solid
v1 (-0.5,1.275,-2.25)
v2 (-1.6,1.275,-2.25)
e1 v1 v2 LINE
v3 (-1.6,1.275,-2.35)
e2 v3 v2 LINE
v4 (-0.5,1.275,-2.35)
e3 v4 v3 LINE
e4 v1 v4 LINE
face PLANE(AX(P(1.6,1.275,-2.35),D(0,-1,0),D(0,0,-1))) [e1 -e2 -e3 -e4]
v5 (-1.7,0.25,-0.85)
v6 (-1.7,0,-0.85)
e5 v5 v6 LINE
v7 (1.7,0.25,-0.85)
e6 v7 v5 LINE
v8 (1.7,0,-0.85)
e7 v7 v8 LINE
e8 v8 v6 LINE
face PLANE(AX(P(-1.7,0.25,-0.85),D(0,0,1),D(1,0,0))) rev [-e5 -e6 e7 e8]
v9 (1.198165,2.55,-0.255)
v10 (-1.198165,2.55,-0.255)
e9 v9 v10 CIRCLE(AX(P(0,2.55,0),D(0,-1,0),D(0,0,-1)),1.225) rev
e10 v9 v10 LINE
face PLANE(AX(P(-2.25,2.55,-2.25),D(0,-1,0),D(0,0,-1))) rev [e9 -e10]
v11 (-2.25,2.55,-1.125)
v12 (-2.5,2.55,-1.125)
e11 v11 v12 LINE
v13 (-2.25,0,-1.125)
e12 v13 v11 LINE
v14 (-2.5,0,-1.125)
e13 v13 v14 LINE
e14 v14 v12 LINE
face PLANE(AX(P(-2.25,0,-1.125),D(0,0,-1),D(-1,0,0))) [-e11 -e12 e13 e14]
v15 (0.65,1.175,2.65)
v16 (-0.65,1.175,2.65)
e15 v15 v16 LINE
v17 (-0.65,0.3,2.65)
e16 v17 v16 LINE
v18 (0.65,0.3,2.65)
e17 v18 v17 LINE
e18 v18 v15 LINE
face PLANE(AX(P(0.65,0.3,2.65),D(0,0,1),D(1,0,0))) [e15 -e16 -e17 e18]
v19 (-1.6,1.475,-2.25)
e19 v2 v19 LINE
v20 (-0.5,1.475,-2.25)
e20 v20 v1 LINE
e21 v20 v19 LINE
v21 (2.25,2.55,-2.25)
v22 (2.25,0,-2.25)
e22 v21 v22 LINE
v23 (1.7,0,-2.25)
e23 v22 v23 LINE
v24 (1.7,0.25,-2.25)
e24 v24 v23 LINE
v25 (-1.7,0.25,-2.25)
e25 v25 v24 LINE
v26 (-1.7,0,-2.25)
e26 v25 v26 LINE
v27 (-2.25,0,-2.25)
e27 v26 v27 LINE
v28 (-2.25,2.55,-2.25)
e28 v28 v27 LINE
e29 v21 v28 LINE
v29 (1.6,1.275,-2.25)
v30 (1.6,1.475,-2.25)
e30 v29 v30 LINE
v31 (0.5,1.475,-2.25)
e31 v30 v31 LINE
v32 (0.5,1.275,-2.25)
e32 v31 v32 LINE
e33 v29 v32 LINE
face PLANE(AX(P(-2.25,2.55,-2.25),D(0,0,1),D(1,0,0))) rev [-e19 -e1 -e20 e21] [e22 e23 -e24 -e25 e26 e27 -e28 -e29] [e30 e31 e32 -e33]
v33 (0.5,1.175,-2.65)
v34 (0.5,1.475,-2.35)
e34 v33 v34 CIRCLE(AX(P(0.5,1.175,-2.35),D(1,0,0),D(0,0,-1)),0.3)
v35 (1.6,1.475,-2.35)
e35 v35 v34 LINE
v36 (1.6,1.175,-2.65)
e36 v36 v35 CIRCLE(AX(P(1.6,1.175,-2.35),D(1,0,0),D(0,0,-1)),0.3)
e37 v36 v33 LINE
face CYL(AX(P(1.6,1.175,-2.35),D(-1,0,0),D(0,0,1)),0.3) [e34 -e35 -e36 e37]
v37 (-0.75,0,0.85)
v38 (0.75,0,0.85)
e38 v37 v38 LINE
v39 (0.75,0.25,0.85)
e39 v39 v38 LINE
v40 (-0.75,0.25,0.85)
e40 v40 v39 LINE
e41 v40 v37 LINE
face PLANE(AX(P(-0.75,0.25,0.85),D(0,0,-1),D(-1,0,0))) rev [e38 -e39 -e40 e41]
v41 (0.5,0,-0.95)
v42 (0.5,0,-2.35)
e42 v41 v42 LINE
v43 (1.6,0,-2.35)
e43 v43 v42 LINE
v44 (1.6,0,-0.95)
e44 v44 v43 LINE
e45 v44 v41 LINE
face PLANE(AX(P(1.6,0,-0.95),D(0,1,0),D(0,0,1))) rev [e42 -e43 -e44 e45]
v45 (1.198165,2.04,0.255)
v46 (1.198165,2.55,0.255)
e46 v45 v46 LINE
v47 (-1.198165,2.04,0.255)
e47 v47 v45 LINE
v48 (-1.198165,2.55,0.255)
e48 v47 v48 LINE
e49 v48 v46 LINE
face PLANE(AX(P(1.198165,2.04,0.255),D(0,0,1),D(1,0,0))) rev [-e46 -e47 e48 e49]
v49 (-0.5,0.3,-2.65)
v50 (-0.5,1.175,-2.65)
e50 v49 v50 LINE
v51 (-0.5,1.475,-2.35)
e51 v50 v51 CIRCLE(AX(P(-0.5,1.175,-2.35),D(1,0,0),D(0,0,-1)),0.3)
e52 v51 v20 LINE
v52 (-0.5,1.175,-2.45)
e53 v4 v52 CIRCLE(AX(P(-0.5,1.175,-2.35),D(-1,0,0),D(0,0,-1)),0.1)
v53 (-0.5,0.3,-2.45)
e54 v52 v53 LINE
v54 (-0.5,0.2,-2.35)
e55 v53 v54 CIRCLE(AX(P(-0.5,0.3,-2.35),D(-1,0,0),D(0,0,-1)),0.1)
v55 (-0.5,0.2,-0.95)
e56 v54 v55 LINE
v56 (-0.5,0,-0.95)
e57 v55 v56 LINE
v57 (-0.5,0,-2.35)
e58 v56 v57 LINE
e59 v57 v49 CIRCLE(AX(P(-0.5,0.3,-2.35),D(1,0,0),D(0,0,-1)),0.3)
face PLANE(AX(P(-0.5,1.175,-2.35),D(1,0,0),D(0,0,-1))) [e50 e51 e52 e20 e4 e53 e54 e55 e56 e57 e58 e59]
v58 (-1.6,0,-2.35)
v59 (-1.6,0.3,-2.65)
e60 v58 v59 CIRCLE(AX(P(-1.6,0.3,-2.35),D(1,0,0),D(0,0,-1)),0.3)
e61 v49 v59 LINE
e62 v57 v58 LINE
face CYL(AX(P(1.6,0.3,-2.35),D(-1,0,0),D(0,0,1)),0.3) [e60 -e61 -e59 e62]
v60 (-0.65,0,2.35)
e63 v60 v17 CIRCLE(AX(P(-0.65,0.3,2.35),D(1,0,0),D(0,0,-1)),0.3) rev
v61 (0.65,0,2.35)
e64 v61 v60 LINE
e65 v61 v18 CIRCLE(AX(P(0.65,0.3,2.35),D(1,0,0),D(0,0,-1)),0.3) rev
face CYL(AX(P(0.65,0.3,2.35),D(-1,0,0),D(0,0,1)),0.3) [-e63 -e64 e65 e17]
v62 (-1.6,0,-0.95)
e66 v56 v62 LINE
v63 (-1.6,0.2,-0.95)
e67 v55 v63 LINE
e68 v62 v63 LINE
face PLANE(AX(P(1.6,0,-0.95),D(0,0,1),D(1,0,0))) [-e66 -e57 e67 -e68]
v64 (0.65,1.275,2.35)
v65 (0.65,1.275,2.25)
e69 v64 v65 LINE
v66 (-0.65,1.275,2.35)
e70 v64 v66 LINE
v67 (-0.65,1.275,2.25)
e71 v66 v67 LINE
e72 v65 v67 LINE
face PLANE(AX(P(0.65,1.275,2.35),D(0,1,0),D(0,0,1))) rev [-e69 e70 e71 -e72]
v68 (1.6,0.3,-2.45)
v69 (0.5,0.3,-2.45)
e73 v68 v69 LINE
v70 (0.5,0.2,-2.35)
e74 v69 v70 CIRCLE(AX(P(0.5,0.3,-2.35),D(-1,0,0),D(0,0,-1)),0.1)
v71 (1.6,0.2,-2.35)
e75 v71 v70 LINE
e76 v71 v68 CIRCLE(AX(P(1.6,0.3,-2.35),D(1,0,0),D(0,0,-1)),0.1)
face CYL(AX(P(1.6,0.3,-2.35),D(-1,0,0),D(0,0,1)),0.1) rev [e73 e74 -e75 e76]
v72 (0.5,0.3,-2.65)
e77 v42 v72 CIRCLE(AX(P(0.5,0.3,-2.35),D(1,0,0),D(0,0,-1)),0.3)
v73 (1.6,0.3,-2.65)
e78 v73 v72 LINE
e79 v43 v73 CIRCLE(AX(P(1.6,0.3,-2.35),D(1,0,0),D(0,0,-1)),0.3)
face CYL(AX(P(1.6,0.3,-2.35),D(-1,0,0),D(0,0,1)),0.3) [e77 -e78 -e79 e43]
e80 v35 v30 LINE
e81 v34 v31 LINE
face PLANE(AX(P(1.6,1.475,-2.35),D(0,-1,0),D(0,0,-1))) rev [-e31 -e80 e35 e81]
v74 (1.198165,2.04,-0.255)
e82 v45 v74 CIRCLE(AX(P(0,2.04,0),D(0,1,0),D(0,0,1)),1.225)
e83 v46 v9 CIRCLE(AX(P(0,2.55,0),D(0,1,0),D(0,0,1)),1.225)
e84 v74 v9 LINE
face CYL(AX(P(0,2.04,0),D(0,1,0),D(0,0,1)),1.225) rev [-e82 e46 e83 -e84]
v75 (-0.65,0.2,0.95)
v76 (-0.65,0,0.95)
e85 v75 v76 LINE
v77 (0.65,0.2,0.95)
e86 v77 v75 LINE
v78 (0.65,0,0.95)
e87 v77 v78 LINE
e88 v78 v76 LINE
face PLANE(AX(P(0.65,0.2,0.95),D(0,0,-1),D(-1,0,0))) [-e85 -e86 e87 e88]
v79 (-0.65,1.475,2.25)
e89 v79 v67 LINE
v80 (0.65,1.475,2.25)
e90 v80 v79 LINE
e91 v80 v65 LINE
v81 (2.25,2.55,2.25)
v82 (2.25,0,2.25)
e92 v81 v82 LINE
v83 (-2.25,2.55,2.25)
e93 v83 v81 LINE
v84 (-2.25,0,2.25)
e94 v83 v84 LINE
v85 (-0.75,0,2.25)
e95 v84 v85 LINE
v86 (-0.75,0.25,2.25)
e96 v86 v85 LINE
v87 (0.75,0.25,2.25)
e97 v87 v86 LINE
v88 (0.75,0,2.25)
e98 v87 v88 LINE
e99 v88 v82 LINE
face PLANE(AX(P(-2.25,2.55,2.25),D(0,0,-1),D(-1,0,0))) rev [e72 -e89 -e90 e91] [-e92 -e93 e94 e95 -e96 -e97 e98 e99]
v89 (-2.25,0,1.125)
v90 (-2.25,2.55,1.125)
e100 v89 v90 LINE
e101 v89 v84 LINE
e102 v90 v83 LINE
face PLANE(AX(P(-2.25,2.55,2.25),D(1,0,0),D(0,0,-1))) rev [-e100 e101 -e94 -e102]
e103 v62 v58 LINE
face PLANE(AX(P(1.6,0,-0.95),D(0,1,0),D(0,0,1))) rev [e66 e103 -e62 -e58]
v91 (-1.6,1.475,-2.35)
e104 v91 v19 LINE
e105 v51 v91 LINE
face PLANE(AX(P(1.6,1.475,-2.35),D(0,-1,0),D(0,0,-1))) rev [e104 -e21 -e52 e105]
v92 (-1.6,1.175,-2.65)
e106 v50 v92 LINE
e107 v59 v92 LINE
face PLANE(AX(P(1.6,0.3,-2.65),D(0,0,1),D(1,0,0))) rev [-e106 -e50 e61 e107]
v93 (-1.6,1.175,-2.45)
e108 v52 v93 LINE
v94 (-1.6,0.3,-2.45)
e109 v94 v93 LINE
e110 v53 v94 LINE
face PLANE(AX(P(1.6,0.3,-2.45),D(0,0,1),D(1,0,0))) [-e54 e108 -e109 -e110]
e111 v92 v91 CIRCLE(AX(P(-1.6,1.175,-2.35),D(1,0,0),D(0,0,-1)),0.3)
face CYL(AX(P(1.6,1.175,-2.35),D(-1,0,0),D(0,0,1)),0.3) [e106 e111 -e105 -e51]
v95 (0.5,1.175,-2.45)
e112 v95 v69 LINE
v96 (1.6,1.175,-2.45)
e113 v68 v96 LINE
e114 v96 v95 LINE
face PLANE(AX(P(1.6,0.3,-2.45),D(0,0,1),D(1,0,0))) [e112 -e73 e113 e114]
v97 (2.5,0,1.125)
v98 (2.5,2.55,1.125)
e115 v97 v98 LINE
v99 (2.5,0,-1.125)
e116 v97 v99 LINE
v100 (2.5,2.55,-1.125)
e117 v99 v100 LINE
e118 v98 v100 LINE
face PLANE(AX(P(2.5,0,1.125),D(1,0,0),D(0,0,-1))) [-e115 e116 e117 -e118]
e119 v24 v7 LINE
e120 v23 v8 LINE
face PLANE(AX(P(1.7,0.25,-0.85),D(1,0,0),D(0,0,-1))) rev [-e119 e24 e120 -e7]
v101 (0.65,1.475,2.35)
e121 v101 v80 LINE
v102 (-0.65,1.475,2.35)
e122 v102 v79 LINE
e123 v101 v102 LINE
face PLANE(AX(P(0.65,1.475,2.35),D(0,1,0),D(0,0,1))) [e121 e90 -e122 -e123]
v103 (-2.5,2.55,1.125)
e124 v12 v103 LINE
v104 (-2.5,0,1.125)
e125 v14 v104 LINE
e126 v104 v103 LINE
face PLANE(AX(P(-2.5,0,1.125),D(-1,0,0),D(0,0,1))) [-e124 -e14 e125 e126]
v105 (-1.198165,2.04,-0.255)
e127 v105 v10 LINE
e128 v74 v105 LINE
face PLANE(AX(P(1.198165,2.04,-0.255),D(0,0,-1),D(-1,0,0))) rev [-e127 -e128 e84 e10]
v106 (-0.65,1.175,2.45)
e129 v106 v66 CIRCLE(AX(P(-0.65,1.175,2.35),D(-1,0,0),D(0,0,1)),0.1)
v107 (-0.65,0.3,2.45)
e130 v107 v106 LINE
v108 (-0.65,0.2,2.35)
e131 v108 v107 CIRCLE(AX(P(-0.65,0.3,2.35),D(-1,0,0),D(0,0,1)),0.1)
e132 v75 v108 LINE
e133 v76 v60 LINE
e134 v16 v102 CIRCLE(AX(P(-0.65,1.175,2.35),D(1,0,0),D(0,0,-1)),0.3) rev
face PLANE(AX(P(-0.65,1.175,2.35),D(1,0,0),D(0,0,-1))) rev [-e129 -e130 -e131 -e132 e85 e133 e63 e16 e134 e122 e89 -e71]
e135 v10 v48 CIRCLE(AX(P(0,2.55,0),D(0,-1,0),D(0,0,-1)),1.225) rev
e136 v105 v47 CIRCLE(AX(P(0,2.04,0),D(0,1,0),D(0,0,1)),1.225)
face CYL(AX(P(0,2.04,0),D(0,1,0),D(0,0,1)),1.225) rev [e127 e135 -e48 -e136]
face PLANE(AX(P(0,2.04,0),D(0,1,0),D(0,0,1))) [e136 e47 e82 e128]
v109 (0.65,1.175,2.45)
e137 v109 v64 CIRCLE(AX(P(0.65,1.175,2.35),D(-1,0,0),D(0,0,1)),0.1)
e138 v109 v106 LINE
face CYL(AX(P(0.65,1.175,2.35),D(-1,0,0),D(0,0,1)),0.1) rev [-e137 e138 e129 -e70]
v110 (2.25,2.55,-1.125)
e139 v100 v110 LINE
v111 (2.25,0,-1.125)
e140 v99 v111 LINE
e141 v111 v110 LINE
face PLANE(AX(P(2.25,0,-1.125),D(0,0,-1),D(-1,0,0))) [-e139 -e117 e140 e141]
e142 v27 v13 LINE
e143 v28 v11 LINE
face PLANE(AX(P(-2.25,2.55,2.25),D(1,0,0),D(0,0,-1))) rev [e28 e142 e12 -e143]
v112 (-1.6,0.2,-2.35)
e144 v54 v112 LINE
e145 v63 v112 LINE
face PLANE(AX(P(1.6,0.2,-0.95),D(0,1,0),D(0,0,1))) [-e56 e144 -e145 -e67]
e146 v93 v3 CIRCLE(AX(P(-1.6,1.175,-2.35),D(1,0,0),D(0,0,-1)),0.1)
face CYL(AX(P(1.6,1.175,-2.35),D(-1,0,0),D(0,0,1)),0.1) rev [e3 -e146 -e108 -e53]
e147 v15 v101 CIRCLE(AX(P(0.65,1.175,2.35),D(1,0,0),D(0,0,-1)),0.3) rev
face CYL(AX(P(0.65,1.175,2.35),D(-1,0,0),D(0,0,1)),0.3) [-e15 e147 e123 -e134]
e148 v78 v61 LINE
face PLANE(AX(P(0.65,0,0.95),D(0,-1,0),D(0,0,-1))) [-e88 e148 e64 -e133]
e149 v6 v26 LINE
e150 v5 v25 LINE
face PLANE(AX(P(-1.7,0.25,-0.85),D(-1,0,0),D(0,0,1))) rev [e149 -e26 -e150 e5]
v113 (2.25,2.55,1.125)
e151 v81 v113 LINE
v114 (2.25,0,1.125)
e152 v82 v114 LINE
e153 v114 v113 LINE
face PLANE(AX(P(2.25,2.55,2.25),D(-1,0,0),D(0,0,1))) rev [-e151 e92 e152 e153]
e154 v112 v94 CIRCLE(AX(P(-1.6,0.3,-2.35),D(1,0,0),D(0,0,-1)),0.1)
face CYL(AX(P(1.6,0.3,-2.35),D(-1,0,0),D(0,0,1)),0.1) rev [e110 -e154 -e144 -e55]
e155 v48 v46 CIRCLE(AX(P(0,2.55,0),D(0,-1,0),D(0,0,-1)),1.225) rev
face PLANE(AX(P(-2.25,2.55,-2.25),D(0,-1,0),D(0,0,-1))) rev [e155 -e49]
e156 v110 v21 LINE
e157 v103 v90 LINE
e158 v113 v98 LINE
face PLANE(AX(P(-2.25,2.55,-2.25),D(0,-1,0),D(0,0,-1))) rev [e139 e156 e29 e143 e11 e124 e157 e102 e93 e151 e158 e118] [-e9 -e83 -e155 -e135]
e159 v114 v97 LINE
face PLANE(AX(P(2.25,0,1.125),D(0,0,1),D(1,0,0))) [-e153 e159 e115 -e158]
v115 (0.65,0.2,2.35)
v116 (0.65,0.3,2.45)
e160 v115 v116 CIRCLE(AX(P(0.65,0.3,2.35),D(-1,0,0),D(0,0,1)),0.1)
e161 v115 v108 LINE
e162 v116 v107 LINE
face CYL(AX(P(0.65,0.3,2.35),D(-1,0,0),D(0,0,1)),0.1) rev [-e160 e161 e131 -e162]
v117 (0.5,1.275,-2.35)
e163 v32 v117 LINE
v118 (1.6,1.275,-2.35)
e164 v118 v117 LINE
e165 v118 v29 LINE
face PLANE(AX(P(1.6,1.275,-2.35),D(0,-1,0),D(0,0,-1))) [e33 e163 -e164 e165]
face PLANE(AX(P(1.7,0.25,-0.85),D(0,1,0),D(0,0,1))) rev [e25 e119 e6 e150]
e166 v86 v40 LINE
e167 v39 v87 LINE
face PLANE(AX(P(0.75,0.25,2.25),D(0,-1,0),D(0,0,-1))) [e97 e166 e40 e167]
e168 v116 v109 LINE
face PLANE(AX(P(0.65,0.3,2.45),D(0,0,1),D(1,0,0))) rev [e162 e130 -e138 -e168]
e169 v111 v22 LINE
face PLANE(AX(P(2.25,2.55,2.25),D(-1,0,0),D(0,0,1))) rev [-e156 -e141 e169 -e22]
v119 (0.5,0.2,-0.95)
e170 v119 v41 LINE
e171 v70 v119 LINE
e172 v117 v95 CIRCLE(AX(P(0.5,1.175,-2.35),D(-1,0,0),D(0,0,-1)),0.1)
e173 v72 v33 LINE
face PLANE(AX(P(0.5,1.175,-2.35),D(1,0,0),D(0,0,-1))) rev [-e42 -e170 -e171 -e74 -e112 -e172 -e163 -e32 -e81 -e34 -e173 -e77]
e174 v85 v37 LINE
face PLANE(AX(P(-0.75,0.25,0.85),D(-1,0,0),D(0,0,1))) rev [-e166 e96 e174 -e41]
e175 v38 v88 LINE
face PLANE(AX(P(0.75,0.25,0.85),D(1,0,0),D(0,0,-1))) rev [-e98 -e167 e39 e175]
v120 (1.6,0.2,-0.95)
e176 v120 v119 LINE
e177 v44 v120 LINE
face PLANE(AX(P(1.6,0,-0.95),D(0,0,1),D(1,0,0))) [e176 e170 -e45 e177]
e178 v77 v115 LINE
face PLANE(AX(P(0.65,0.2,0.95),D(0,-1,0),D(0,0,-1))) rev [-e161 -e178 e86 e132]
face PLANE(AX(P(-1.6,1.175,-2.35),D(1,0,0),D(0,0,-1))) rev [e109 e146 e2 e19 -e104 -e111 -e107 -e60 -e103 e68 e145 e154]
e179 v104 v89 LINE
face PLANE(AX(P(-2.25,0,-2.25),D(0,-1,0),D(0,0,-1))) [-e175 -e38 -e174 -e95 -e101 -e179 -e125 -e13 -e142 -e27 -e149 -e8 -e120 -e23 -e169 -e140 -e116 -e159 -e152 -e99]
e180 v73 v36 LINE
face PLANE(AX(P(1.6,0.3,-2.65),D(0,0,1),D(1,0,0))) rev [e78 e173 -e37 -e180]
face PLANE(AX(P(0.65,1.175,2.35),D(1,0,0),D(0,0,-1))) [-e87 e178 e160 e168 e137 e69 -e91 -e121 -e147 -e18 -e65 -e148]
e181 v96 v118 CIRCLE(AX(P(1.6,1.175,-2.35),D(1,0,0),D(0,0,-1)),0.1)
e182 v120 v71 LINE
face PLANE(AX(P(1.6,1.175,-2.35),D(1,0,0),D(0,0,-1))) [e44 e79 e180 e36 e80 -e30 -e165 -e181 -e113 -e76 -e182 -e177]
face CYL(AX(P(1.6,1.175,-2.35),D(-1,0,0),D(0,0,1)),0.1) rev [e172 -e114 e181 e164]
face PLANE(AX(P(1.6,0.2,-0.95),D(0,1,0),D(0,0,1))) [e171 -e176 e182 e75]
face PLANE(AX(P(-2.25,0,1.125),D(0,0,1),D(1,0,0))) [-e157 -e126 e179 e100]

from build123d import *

# Parameters (mm, degrees)
SKETCH1_W                        = 4.5
SKETCH1_H                        = 4.5
BASE_EXTRUDE_DEPTH               = 2.55
SKETCH2_W                        = 0.25
SKETCH2_H                        = 2.25
EARS_EXTRUDE1_DEPTH              = 2.55
SKETCH9_W                        = 3.4
SKETCH9_H                        = 1.4
SKETCH9_W_2                      = 1.5
RELIEF_CUT_BTM_DEPTH             = 0.25
DOUBLE_START                     = -1.6
DOUBLE_FEET_EXTRUDE_THIN1_DEPTH  = 3.2
SINGLE_START                     = -0.65
SINGLE_FOOT_EXTRUDE_THIN2_DEPTH  = 1.3
REMOVE_MIDDLE_OF_FEET_DEPTH      = 0.5
SCREW_DRIVER_SLOT_EXTRUDE2_DEPTH = 0.51


# Read off the part's stored shape, not the designer's step: double feet-Extrude-Thin1, single foot-Extrude-Thin2
with BuildPart() as part:
    # Sketch1 → Base-Extrude (new body)
    with BuildSketch(Plane(origin=(0, 0, 0), x_dir=(1, 0, 0), z_dir=(0, 1, 0))):
        Rectangle(SKETCH1_W, SKETCH1_H)
    extrude(amount=BASE_EXTRUDE_DEPTH)

    # Sketch2 → ears-Extrude1 (add, through all)
    with BuildSketch(Plane(origin=(0, 2.55, 0), x_dir=(-1, 0, 0), z_dir=(0, 1, 0))):
        with Locations((-2.375, 0)):
            Rectangle(SKETCH2_W, SKETCH2_H)
        with Locations((2.375, 0)):
            Rectangle(SKETCH2_W, SKETCH2_H)
    extrude(amount=-EARS_EXTRUDE1_DEPTH)

    # Sketch9 → relief-cut-btm (cut)
    with BuildSketch(Plane.XZ):
        with Locations((0, -1.55)):
            Rectangle(SKETCH9_W, SKETCH9_H)
        with Locations((0, 1.55)):
            Rectangle(SKETCH9_W_2, SKETCH9_H)
    extrude(amount=-RELIEF_CUT_BTM_DEPTH, mode=Mode.SUBTRACT)

    # double feet-Extrude-Thin1 outline → double feet-Extrude-Thin1 (add)
    with BuildSketch(Plane(origin=(0, 0, 0), x_dir=(0, 0, -1), z_dir=(1, 0, 0)).offset(DOUBLE_START)):
        with BuildLine():
            ThreePointArc((2.35, 0), (2.562132034, 0.087867966), (2.65, 0.3))
            Line((2.65, 0.3), (2.65, 1.175))
            ThreePointArc((2.65, 1.175), (2.562132034, 1.387132034), (2.35, 1.475))
            Line((2.35, 1.475), (2.25, 1.475))
            Line((2.25, 1.475), (2.25, 1.275))
            Line((2.25, 1.275), (2.35, 1.275))
            ThreePointArc((2.35, 1.275), (2.420710678, 1.245710678), (2.45, 1.175))
            Line((2.45, 1.175), (2.45, 0.3))
            ThreePointArc((2.45, 0.3), (2.420710678, 0.229289322), (2.35, 0.2))
            Line((2.35, 0.2), (0.95, 0.2))
            Line((0.95, 0.2), (0.95, 0))
            Line((0.95, 0), (2.35, 0))
        make_face()
    extrude(amount=DOUBLE_FEET_EXTRUDE_THIN1_DEPTH)

    # single foot-Extrude-Thin2 outline → single foot-Extrude-Thin2 (add)
    with BuildSketch(Plane(origin=(0, 0, 0), x_dir=(0, 0, -1), z_dir=(1, 0, 0)).offset(SINGLE_START)):
        with BuildLine():
            ThreePointArc((-2.65, 0.3), (-2.562132034, 0.087867966), (-2.35, 0))
            Line((-2.35, 0), (-0.95, 0))
            Line((-0.95, 0), (-0.95, 0.2))
            Line((-0.95, 0.2), (-2.35, 0.2))
            ThreePointArc((-2.35, 0.2), (-2.420710678, 0.229289322), (-2.45, 0.3))
            Line((-2.45, 0.3), (-2.45, 1.175))
            ThreePointArc((-2.45, 1.175), (-2.420710678, 1.245710678), (-2.35, 1.275))
            Line((-2.35, 1.275), (-2.25, 1.275))
            Line((-2.25, 1.275), (-2.25, 1.475))
            Line((-2.25, 1.475), (-2.35, 1.475))
            ThreePointArc((-2.35, 1.475), (-2.562132034, 1.387132034), (-2.65, 1.175))
            Line((-2.65, 1.175), (-2.65, 0.3))
        make_face()
    extrude(amount=SINGLE_FOOT_EXTRUDE_THIN2_DEPTH)

    # Sketch10 → remove-middle-of-feet (cut, symmetric)
    with BuildSketch(Plane(origin=(0, 0, 0), x_dir=(0, 0, -1), z_dir=(1, 0, 0))):
        with BuildLine():
            Line((2.35, 1.475), (2.25, 1.475))
            Line((2.25, 1.475), (2.25, 1.275))
            Line((2.25, 1.275), (2.35, 1.275))
            ThreePointArc((2.35, 1.275), (2.420710678, 1.245710678), (2.45, 1.175))
            Line((2.45, 1.175), (2.45, 0.3))
            ThreePointArc((2.45, 0.3), (2.420710678, 0.229289322), (2.35, 0.2))
            Line((2.35, 0.2), (0.95, 0.2))
            Line((0.95, 0.2), (0.95, 0))
            Line((0.95, 0), (2.35, 0))
            ThreePointArc((2.35, 0), (2.562132034, 0.087867966), (2.65, 0.3))
            Line((2.65, 0.3), (2.65, 1.175))
            ThreePointArc((2.65, 1.175), (2.562132034, 1.387132034), (2.35, 1.475))
        make_face()
    extrude(amount=REMOVE_MIDDLE_OF_FEET_DEPTH, both=True, mode=Mode.SUBTRACT)

    # Sketch7 → screw driver slot-Extrude2 (cut)
    with BuildSketch(Plane(origin=(0, 2.55, 0), x_dir=(-1, 0, 0), z_dir=(0, 1, 0))):
        with BuildLine():
            Line((-1.198165264, 0.255), (1.198165264, 0.255))
            ThreePointArc((1.198165264, 0.255), (1.225, 0), (1.198165264, -0.255))
            Line((1.198165264, -0.255), (-1.198165264, -0.255))
            ThreePointArc((-1.198165264, -0.255), (-1.225, 0), (-1.198165264, 0.255))
        make_face()
    extrude(amount=-SCREW_DRIVER_SLOT_EXTRUDE2_DEPTH, mode=Mode.SUBTRACT)


solid = part.part
